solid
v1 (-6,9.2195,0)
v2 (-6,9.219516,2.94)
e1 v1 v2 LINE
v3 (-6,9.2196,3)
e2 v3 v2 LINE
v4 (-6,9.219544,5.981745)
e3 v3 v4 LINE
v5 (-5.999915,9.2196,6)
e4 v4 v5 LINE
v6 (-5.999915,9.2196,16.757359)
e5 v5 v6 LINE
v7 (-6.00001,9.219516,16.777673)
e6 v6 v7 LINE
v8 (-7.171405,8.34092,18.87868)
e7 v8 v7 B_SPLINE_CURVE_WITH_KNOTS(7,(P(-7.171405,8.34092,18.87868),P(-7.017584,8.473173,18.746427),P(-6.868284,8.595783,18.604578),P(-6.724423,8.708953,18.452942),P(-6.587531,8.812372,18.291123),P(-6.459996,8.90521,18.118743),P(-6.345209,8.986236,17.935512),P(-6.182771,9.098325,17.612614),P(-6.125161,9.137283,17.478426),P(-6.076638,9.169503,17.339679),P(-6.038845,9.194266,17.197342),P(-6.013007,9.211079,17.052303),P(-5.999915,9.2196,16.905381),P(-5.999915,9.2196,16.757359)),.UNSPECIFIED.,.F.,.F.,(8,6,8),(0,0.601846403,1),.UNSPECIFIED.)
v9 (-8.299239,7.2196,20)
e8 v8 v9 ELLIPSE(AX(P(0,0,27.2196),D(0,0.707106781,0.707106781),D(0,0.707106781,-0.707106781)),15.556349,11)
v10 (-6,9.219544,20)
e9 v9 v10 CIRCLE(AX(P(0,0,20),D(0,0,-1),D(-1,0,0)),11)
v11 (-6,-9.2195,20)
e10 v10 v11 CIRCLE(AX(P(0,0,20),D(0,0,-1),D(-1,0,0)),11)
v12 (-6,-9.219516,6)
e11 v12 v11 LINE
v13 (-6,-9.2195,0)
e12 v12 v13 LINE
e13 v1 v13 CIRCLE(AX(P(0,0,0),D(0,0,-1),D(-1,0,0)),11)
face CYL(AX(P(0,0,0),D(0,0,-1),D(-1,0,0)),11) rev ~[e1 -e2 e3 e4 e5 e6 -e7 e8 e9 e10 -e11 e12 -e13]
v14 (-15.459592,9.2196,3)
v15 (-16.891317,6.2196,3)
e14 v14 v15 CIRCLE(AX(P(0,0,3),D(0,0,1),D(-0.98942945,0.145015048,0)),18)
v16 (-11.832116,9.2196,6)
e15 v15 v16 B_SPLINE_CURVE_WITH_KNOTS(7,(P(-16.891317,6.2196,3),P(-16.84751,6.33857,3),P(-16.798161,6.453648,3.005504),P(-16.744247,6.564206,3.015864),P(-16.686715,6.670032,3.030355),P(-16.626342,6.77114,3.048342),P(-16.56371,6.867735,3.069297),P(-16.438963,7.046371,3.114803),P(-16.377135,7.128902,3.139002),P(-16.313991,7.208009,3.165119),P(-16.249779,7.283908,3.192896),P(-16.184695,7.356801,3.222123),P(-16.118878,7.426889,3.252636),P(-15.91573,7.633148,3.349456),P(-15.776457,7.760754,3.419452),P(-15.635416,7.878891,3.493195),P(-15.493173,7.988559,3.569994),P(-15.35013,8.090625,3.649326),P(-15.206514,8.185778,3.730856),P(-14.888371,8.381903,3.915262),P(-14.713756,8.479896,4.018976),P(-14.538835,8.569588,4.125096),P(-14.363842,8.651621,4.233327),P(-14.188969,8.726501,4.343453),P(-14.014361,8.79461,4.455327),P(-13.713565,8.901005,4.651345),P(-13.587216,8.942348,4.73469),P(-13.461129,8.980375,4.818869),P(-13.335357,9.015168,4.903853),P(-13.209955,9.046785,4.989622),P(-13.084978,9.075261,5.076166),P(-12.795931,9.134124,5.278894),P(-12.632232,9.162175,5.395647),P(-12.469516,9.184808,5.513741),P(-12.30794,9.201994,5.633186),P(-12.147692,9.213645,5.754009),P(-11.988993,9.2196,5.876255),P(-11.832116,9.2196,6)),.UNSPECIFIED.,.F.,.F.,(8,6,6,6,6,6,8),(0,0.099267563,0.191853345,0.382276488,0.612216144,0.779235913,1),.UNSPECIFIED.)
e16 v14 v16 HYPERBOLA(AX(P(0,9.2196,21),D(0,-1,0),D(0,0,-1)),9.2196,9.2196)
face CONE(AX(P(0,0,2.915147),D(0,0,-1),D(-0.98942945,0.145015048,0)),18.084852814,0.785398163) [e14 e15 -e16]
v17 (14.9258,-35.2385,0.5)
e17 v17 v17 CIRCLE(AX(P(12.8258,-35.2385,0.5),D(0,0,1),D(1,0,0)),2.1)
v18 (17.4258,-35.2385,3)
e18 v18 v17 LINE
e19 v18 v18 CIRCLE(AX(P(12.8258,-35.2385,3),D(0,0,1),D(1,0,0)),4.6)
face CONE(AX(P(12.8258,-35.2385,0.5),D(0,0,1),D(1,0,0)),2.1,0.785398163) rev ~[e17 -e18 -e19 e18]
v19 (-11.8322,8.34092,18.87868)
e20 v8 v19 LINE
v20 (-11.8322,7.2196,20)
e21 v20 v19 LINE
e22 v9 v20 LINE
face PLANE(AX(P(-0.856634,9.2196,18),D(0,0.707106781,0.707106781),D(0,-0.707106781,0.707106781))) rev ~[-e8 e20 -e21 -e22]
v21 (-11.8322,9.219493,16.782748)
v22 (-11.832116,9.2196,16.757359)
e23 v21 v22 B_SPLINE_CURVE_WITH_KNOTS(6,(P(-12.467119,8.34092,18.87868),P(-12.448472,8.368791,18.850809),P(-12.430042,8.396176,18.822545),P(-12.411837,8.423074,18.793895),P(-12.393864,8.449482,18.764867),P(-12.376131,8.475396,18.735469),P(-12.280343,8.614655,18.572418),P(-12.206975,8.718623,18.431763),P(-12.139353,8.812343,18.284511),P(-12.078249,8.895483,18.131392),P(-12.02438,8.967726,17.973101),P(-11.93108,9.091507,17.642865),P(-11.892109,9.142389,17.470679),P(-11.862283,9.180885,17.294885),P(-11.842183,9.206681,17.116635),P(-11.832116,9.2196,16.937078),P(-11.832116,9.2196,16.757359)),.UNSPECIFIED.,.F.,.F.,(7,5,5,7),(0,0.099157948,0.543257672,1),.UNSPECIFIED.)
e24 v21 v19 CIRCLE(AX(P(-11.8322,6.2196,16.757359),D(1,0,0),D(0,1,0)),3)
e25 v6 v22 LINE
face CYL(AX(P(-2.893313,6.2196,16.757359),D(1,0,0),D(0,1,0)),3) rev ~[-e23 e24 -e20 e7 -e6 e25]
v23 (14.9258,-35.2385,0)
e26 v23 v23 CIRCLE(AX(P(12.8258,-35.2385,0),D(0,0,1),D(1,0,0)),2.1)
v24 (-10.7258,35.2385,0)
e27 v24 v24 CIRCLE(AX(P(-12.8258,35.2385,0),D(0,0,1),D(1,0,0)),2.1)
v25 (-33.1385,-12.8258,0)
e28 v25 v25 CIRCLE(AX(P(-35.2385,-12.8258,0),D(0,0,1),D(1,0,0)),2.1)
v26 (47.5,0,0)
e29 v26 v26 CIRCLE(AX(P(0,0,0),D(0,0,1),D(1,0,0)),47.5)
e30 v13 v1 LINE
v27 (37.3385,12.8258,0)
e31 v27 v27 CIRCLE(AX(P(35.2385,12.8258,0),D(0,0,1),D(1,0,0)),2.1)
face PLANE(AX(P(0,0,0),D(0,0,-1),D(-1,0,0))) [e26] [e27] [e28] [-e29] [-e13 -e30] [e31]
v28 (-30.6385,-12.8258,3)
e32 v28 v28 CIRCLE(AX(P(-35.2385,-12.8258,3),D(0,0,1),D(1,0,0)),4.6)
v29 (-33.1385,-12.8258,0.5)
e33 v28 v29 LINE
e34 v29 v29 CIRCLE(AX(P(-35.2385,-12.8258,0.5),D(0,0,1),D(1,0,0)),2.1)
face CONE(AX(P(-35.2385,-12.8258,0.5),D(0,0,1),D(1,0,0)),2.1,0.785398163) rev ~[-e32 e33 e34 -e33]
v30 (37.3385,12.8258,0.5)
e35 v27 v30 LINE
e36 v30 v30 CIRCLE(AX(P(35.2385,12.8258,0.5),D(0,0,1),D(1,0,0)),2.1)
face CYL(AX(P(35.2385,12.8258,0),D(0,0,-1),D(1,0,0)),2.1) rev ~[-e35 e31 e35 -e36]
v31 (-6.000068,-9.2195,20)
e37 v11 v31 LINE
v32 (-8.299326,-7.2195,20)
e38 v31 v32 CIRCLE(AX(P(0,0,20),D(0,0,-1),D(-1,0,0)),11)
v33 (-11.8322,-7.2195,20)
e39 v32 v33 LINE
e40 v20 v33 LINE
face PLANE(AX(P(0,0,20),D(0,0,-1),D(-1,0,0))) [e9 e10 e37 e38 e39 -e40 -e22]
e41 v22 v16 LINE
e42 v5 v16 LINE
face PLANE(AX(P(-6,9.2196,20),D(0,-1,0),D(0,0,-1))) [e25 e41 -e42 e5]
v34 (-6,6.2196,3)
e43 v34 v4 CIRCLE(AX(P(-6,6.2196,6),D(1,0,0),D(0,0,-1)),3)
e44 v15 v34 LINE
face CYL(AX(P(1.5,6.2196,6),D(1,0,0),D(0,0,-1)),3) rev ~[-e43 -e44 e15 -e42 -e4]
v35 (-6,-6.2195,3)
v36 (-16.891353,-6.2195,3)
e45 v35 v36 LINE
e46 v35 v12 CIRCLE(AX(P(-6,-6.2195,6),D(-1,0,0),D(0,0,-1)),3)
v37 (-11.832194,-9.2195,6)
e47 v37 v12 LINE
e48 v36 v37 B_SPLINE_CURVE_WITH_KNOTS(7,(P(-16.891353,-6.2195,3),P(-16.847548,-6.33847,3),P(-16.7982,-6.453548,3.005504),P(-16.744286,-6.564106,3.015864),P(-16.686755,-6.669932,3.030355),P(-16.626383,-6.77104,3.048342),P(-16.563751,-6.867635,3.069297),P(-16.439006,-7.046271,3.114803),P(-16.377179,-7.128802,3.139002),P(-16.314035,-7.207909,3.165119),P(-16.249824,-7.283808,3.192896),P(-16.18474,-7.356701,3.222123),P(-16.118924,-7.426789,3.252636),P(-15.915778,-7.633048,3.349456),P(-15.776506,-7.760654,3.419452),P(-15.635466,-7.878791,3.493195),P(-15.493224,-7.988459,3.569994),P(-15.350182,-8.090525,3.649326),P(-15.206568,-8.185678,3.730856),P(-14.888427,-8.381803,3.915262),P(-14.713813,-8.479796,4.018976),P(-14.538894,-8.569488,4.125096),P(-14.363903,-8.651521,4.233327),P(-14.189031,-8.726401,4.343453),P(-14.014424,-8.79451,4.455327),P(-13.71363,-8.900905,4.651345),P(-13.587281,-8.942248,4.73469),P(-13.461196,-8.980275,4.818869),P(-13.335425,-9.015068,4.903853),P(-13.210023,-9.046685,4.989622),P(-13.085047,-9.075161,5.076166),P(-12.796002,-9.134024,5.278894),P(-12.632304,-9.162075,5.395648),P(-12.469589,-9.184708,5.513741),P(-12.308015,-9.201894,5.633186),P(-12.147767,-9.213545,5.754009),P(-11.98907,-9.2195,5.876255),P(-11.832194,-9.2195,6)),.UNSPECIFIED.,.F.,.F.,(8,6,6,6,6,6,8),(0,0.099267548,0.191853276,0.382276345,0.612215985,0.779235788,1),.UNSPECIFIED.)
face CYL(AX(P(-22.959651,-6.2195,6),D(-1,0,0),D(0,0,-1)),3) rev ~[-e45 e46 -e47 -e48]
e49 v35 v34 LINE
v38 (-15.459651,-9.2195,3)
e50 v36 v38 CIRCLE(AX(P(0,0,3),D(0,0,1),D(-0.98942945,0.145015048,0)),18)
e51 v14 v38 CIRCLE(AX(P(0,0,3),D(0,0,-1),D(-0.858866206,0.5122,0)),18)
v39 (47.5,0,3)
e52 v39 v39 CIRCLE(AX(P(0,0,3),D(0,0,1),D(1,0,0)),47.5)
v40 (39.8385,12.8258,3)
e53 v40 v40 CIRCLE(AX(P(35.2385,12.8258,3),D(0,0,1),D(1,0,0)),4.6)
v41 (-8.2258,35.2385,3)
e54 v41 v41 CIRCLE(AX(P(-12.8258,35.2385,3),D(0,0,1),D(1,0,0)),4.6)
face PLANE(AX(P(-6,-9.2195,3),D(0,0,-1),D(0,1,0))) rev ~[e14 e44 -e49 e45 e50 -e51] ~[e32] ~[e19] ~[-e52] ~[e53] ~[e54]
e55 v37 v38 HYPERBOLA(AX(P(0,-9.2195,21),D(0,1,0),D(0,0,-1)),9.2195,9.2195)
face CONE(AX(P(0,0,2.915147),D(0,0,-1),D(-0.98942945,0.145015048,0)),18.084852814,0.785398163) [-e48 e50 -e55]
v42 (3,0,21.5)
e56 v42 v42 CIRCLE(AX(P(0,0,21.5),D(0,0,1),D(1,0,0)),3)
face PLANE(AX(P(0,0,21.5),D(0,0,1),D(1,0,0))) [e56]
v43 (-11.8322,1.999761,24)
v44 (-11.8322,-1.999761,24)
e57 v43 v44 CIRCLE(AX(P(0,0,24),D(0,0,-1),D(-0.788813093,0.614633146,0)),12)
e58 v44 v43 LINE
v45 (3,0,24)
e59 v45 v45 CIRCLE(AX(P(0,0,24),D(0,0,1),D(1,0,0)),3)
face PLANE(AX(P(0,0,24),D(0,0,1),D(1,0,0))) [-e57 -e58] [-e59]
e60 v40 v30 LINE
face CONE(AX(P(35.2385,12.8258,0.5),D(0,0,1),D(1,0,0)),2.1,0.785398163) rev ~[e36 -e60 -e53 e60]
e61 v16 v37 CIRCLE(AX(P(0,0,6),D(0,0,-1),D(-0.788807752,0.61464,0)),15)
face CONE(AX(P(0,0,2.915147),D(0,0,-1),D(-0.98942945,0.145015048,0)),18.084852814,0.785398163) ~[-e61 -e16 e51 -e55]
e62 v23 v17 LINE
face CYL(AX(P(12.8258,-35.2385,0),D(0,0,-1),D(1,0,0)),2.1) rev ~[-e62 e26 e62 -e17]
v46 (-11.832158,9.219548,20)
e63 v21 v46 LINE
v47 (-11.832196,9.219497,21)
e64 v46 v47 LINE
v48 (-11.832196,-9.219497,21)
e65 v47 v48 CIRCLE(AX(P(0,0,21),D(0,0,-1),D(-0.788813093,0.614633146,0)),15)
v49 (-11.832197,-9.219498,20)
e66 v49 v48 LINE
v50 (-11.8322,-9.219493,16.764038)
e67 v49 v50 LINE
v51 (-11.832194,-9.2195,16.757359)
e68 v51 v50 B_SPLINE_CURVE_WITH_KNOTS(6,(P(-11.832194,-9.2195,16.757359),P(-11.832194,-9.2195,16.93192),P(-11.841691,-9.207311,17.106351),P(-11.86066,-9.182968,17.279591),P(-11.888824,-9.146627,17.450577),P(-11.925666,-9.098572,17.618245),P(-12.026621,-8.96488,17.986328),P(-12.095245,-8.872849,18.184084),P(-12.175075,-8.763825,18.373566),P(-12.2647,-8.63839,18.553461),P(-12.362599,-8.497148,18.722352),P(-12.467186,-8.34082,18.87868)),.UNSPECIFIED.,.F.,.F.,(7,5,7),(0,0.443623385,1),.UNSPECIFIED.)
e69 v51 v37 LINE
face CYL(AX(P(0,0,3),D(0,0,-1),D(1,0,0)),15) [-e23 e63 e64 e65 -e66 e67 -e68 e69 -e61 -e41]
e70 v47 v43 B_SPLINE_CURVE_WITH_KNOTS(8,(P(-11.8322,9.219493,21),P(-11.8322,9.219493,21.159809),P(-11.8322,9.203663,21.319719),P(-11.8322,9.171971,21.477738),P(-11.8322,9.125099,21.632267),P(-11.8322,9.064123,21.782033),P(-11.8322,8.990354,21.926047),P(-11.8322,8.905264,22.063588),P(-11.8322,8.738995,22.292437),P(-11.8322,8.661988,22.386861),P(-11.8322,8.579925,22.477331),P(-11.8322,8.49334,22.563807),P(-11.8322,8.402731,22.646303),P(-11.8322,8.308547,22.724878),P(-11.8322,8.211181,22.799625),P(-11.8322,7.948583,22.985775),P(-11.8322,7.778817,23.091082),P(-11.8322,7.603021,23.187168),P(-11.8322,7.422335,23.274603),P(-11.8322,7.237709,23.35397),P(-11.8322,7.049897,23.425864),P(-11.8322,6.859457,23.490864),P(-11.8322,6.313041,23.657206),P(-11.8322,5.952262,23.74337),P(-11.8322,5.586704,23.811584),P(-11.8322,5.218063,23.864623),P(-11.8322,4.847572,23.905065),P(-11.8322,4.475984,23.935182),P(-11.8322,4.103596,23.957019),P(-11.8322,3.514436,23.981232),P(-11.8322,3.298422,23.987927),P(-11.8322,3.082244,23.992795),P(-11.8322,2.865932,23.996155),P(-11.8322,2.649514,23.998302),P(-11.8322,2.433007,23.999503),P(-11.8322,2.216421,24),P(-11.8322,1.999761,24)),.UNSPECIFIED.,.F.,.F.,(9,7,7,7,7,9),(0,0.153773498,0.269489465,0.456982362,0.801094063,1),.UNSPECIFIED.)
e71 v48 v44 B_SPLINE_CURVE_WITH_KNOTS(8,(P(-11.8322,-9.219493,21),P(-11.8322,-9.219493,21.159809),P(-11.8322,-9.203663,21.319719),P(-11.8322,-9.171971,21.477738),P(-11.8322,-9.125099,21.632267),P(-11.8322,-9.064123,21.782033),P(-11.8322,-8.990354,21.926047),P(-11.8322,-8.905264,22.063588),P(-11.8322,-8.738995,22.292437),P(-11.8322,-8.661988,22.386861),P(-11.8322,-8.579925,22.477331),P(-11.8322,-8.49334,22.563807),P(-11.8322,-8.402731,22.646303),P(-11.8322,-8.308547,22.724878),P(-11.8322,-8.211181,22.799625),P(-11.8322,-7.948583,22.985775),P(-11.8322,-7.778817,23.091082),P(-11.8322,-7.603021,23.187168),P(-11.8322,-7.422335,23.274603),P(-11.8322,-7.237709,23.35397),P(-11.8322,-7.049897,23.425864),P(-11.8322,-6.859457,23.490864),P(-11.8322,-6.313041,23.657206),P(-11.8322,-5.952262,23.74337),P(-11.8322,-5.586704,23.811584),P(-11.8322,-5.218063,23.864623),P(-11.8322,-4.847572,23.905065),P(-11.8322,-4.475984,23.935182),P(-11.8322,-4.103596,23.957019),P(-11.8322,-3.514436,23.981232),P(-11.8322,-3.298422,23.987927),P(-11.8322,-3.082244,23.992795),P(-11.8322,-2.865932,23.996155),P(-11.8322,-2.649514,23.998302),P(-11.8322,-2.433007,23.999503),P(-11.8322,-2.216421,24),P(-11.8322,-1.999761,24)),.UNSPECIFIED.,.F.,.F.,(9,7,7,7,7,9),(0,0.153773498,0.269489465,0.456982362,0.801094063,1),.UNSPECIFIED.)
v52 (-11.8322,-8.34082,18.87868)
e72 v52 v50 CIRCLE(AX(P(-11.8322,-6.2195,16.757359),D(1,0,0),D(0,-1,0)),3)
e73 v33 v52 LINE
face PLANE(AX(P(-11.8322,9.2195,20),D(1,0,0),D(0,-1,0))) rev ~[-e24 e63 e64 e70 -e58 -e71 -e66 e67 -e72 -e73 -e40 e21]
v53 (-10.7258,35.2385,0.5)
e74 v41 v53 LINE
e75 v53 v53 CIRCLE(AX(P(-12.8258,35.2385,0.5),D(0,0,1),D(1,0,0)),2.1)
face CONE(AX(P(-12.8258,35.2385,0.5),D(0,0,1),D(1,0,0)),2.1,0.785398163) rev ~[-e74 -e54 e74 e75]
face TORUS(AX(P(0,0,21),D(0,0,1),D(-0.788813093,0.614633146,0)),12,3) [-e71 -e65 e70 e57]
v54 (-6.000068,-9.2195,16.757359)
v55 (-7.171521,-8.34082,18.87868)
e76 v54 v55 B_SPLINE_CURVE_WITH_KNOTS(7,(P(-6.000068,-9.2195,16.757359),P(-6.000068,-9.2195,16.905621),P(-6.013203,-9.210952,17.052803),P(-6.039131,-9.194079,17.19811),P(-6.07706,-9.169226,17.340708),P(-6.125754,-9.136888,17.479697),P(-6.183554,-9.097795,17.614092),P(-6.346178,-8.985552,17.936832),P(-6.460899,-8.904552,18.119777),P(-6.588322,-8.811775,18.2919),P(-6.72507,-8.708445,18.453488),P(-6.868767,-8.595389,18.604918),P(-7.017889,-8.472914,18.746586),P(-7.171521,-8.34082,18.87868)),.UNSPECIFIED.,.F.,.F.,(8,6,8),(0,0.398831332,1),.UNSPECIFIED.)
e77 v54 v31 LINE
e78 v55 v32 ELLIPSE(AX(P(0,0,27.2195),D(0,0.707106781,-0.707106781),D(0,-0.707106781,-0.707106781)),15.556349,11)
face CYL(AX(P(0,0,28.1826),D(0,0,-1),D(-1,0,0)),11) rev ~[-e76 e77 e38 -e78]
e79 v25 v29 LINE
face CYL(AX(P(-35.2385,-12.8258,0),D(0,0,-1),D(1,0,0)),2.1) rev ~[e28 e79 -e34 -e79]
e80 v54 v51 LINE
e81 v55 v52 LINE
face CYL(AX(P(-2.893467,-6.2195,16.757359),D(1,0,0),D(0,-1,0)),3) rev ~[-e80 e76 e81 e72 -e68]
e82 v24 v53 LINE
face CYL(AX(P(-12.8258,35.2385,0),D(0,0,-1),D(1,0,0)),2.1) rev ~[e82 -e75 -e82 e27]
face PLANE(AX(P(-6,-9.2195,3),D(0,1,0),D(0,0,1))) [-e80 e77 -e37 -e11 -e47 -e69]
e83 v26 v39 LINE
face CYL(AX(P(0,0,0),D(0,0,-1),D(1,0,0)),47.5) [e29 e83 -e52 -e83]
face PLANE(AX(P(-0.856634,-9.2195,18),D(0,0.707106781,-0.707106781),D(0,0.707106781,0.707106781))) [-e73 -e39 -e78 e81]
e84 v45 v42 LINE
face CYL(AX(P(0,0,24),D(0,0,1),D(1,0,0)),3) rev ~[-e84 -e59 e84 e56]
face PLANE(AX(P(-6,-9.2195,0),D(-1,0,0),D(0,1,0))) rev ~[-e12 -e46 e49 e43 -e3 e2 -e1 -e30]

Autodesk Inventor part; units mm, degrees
ref_plane "YZ Plane" through (0, 0, 0) normal (1, 0, 0) x (0, 1, 0)
ref_plane "XZ Plane" through (0, 0, 0) normal (0, 1, 0) x (-1, 0, 0)
ref_plane "XY Plane" through (0, 0, 0) normal (0, 0, 1) x (1, 0, 0)
sketch "Skizze1" plane through (0, 0, 0) normal (0, 0, 1) x (1, 0, 0)
  circle A0 centre (-35.2385, -12.8258) radius 2.1 projected
  circle A1 centre (-12.8258, 35.2385) radius 2.1 projected
  circle A2 centre (12.8258, -35.2385) radius 2.1 projected
  circle A3 centre (35.2385, 12.8258) radius 2.1 projected
  circle A4 centre (0, 0) radius 25 projected
  circle A5 centre (0, 0) radius 45 projected
  circle A6 centre (0, 0) radius 47.5 projected
  circle A7 centre (0, 0) radius 8.4675
  point P0 (0, 0)
extrude "Extrusion1" add sketch "Skizze1" along normal blind 3 contours A4 | A5 | A6 | A7
sketch "Skizze2" plane through (0, 0, 3) normal (0, 0, 1) x (1, 0, 0)
  circle A0 centre (0, 0) radius 15
  dimension "d2" = 30
extrude "Extrusion2" add sketch "Skizze2" along normal blind 21
sketch "Skizze3" plane through (0, 0, 24) normal (0, 0, 1) x (1, 0, 0)
  circle A0 centre (0, 0) radius 3
  dimension "d7" = 6
extrude "Extrusion3" cut sketch "Skizze3" against normal blind 2.5
sketch "Skizze4" plane through (0, 0, 0) normal (0, 0, -1) x (-1, 0, 0)
  circle A0 centre (0, 0) radius 15 projected
  circle A1 centre (0, 0) radius 11
  dimension "d8" = 4
extrude "Extrusion4" cut sketch "Skizze4" against normal blind 20 contours A1
sketch "Skizze5" plane through (0, 0, 0) normal (0, 0, -1) x (-1, 0, 0)
  circle A0 centre (0, 0) radius 11 projected
  circle A1 centre (-35.2385, 12.8258) radius 2.1 projected
  circle A2 centre (-12.8258, -35.2385) radius 2.1 projected
  circle A3 centre (12.8258, 35.2385) radius 2.1 projected
  circle A4 centre (35.2385, -12.8258) radius 2.1 projected
  circle A5 centre (0, 0) radius 47.5 projected
  line L0 (6, -9.2195) -> (6, 9.2195)
  dimension "d11" = 6
extrude "Extrusion5" add sketch "Skizze5" against normal up to surface (20 mm away) contours A0 L0 picked at (7.6667, 0)
sketch "Skizze6" plane through (-6, -9.2195, 0) normal (1, 0, 0) x (0, 0, -1)
  line L0 (-20, 0) -> (-20, 18.4391) projected
  line L1 (0, 0) -> (-20, 0) projected
  line L2 (0, 18.4391) -> (0, 0) projected
  line L3 (-20, 18.4391) -> (0, 18.4391) projected
  line L4 (-3, -5.7805) -> (-3, 24.2195) projected
  line L5 (-3, 19.9453) -> (-3, 24.1453) projected
  line L6 (-3, -28.1189) -> (-3, -23.9189) projected
  line L7 (-3, 42.358) -> (-3, 46.558) projected
  line L8 (-3, -5.7062) -> (-3, -1.5062) projected
  line L9 (-3, 56.7195) -> (-3, -38.2805) projected
  line L10 (-3, 0) -> (-20, 0)
  line L11 (-20, 0) -> (-20, 18.4391)
  line L12 (-20, 18.4391) -> (-3, 18.4391)
  line L13 (-3, 18.4391) -> (-3, 0)
  point P0 (0, 9.2195)
extrude "Extrusion6" cut sketch "Skizze6" against normal blind 20 contours L0 L3 L4 L1
sketch "Skizze7" plane through (0, 0, 20) normal (0, 0, -1) x (-1, 0, 0)
  arc A0 (6, 9.2195) -> (6, -9.2195) centre (0, 0) ccw projected
  line L0 (6, -9.2195) -> (11.8322, -9.2195) projected
  arc A1 (11.8322, -9.2195) -> (11.8322, 9.2195) centre (0, 0) ccw projected
  line L1 (6, 9.2195) -> (11.8322, 9.2195) projected
  line L2 (11.8322, 9.2195) -> (11.8322, -9.2195)
extrude "Extrusion7" cut sketch "Skizze7" against normal blind 20 contours A1 L2
chamfer "Fase1" distance 3 angle 45 1 edges at (15, 0, 3)
chamfer "Fase2" distance 2.5 angle 45 4 edges at (-14.9258, 35.2385, 3) (33.1385, 12.8258, 3) (10.7258, -35.2385, 3) (-37.3385, -12.8258, 3)
fillet "Rundung1" radius 3 2 edges at (-10.7298, 9.2195, 3) (-10.7298, -9.2195, 3)
chamfer "Fase3" distance 2 angle 45 2 edges at (-8.9161, 9.2195, 20) (-8.9161, -9.2195, 20)
fillet "Rundung2" radius 3 2 edges at (-8.9161, 9.2195, 18) (-8.9161, -9.2195, 18)
fillet "Rundung3" radius 3 1 edges at (15, 0, 24)
properties part number "OberArmMagnet" material "ABS-Kunststoff"
